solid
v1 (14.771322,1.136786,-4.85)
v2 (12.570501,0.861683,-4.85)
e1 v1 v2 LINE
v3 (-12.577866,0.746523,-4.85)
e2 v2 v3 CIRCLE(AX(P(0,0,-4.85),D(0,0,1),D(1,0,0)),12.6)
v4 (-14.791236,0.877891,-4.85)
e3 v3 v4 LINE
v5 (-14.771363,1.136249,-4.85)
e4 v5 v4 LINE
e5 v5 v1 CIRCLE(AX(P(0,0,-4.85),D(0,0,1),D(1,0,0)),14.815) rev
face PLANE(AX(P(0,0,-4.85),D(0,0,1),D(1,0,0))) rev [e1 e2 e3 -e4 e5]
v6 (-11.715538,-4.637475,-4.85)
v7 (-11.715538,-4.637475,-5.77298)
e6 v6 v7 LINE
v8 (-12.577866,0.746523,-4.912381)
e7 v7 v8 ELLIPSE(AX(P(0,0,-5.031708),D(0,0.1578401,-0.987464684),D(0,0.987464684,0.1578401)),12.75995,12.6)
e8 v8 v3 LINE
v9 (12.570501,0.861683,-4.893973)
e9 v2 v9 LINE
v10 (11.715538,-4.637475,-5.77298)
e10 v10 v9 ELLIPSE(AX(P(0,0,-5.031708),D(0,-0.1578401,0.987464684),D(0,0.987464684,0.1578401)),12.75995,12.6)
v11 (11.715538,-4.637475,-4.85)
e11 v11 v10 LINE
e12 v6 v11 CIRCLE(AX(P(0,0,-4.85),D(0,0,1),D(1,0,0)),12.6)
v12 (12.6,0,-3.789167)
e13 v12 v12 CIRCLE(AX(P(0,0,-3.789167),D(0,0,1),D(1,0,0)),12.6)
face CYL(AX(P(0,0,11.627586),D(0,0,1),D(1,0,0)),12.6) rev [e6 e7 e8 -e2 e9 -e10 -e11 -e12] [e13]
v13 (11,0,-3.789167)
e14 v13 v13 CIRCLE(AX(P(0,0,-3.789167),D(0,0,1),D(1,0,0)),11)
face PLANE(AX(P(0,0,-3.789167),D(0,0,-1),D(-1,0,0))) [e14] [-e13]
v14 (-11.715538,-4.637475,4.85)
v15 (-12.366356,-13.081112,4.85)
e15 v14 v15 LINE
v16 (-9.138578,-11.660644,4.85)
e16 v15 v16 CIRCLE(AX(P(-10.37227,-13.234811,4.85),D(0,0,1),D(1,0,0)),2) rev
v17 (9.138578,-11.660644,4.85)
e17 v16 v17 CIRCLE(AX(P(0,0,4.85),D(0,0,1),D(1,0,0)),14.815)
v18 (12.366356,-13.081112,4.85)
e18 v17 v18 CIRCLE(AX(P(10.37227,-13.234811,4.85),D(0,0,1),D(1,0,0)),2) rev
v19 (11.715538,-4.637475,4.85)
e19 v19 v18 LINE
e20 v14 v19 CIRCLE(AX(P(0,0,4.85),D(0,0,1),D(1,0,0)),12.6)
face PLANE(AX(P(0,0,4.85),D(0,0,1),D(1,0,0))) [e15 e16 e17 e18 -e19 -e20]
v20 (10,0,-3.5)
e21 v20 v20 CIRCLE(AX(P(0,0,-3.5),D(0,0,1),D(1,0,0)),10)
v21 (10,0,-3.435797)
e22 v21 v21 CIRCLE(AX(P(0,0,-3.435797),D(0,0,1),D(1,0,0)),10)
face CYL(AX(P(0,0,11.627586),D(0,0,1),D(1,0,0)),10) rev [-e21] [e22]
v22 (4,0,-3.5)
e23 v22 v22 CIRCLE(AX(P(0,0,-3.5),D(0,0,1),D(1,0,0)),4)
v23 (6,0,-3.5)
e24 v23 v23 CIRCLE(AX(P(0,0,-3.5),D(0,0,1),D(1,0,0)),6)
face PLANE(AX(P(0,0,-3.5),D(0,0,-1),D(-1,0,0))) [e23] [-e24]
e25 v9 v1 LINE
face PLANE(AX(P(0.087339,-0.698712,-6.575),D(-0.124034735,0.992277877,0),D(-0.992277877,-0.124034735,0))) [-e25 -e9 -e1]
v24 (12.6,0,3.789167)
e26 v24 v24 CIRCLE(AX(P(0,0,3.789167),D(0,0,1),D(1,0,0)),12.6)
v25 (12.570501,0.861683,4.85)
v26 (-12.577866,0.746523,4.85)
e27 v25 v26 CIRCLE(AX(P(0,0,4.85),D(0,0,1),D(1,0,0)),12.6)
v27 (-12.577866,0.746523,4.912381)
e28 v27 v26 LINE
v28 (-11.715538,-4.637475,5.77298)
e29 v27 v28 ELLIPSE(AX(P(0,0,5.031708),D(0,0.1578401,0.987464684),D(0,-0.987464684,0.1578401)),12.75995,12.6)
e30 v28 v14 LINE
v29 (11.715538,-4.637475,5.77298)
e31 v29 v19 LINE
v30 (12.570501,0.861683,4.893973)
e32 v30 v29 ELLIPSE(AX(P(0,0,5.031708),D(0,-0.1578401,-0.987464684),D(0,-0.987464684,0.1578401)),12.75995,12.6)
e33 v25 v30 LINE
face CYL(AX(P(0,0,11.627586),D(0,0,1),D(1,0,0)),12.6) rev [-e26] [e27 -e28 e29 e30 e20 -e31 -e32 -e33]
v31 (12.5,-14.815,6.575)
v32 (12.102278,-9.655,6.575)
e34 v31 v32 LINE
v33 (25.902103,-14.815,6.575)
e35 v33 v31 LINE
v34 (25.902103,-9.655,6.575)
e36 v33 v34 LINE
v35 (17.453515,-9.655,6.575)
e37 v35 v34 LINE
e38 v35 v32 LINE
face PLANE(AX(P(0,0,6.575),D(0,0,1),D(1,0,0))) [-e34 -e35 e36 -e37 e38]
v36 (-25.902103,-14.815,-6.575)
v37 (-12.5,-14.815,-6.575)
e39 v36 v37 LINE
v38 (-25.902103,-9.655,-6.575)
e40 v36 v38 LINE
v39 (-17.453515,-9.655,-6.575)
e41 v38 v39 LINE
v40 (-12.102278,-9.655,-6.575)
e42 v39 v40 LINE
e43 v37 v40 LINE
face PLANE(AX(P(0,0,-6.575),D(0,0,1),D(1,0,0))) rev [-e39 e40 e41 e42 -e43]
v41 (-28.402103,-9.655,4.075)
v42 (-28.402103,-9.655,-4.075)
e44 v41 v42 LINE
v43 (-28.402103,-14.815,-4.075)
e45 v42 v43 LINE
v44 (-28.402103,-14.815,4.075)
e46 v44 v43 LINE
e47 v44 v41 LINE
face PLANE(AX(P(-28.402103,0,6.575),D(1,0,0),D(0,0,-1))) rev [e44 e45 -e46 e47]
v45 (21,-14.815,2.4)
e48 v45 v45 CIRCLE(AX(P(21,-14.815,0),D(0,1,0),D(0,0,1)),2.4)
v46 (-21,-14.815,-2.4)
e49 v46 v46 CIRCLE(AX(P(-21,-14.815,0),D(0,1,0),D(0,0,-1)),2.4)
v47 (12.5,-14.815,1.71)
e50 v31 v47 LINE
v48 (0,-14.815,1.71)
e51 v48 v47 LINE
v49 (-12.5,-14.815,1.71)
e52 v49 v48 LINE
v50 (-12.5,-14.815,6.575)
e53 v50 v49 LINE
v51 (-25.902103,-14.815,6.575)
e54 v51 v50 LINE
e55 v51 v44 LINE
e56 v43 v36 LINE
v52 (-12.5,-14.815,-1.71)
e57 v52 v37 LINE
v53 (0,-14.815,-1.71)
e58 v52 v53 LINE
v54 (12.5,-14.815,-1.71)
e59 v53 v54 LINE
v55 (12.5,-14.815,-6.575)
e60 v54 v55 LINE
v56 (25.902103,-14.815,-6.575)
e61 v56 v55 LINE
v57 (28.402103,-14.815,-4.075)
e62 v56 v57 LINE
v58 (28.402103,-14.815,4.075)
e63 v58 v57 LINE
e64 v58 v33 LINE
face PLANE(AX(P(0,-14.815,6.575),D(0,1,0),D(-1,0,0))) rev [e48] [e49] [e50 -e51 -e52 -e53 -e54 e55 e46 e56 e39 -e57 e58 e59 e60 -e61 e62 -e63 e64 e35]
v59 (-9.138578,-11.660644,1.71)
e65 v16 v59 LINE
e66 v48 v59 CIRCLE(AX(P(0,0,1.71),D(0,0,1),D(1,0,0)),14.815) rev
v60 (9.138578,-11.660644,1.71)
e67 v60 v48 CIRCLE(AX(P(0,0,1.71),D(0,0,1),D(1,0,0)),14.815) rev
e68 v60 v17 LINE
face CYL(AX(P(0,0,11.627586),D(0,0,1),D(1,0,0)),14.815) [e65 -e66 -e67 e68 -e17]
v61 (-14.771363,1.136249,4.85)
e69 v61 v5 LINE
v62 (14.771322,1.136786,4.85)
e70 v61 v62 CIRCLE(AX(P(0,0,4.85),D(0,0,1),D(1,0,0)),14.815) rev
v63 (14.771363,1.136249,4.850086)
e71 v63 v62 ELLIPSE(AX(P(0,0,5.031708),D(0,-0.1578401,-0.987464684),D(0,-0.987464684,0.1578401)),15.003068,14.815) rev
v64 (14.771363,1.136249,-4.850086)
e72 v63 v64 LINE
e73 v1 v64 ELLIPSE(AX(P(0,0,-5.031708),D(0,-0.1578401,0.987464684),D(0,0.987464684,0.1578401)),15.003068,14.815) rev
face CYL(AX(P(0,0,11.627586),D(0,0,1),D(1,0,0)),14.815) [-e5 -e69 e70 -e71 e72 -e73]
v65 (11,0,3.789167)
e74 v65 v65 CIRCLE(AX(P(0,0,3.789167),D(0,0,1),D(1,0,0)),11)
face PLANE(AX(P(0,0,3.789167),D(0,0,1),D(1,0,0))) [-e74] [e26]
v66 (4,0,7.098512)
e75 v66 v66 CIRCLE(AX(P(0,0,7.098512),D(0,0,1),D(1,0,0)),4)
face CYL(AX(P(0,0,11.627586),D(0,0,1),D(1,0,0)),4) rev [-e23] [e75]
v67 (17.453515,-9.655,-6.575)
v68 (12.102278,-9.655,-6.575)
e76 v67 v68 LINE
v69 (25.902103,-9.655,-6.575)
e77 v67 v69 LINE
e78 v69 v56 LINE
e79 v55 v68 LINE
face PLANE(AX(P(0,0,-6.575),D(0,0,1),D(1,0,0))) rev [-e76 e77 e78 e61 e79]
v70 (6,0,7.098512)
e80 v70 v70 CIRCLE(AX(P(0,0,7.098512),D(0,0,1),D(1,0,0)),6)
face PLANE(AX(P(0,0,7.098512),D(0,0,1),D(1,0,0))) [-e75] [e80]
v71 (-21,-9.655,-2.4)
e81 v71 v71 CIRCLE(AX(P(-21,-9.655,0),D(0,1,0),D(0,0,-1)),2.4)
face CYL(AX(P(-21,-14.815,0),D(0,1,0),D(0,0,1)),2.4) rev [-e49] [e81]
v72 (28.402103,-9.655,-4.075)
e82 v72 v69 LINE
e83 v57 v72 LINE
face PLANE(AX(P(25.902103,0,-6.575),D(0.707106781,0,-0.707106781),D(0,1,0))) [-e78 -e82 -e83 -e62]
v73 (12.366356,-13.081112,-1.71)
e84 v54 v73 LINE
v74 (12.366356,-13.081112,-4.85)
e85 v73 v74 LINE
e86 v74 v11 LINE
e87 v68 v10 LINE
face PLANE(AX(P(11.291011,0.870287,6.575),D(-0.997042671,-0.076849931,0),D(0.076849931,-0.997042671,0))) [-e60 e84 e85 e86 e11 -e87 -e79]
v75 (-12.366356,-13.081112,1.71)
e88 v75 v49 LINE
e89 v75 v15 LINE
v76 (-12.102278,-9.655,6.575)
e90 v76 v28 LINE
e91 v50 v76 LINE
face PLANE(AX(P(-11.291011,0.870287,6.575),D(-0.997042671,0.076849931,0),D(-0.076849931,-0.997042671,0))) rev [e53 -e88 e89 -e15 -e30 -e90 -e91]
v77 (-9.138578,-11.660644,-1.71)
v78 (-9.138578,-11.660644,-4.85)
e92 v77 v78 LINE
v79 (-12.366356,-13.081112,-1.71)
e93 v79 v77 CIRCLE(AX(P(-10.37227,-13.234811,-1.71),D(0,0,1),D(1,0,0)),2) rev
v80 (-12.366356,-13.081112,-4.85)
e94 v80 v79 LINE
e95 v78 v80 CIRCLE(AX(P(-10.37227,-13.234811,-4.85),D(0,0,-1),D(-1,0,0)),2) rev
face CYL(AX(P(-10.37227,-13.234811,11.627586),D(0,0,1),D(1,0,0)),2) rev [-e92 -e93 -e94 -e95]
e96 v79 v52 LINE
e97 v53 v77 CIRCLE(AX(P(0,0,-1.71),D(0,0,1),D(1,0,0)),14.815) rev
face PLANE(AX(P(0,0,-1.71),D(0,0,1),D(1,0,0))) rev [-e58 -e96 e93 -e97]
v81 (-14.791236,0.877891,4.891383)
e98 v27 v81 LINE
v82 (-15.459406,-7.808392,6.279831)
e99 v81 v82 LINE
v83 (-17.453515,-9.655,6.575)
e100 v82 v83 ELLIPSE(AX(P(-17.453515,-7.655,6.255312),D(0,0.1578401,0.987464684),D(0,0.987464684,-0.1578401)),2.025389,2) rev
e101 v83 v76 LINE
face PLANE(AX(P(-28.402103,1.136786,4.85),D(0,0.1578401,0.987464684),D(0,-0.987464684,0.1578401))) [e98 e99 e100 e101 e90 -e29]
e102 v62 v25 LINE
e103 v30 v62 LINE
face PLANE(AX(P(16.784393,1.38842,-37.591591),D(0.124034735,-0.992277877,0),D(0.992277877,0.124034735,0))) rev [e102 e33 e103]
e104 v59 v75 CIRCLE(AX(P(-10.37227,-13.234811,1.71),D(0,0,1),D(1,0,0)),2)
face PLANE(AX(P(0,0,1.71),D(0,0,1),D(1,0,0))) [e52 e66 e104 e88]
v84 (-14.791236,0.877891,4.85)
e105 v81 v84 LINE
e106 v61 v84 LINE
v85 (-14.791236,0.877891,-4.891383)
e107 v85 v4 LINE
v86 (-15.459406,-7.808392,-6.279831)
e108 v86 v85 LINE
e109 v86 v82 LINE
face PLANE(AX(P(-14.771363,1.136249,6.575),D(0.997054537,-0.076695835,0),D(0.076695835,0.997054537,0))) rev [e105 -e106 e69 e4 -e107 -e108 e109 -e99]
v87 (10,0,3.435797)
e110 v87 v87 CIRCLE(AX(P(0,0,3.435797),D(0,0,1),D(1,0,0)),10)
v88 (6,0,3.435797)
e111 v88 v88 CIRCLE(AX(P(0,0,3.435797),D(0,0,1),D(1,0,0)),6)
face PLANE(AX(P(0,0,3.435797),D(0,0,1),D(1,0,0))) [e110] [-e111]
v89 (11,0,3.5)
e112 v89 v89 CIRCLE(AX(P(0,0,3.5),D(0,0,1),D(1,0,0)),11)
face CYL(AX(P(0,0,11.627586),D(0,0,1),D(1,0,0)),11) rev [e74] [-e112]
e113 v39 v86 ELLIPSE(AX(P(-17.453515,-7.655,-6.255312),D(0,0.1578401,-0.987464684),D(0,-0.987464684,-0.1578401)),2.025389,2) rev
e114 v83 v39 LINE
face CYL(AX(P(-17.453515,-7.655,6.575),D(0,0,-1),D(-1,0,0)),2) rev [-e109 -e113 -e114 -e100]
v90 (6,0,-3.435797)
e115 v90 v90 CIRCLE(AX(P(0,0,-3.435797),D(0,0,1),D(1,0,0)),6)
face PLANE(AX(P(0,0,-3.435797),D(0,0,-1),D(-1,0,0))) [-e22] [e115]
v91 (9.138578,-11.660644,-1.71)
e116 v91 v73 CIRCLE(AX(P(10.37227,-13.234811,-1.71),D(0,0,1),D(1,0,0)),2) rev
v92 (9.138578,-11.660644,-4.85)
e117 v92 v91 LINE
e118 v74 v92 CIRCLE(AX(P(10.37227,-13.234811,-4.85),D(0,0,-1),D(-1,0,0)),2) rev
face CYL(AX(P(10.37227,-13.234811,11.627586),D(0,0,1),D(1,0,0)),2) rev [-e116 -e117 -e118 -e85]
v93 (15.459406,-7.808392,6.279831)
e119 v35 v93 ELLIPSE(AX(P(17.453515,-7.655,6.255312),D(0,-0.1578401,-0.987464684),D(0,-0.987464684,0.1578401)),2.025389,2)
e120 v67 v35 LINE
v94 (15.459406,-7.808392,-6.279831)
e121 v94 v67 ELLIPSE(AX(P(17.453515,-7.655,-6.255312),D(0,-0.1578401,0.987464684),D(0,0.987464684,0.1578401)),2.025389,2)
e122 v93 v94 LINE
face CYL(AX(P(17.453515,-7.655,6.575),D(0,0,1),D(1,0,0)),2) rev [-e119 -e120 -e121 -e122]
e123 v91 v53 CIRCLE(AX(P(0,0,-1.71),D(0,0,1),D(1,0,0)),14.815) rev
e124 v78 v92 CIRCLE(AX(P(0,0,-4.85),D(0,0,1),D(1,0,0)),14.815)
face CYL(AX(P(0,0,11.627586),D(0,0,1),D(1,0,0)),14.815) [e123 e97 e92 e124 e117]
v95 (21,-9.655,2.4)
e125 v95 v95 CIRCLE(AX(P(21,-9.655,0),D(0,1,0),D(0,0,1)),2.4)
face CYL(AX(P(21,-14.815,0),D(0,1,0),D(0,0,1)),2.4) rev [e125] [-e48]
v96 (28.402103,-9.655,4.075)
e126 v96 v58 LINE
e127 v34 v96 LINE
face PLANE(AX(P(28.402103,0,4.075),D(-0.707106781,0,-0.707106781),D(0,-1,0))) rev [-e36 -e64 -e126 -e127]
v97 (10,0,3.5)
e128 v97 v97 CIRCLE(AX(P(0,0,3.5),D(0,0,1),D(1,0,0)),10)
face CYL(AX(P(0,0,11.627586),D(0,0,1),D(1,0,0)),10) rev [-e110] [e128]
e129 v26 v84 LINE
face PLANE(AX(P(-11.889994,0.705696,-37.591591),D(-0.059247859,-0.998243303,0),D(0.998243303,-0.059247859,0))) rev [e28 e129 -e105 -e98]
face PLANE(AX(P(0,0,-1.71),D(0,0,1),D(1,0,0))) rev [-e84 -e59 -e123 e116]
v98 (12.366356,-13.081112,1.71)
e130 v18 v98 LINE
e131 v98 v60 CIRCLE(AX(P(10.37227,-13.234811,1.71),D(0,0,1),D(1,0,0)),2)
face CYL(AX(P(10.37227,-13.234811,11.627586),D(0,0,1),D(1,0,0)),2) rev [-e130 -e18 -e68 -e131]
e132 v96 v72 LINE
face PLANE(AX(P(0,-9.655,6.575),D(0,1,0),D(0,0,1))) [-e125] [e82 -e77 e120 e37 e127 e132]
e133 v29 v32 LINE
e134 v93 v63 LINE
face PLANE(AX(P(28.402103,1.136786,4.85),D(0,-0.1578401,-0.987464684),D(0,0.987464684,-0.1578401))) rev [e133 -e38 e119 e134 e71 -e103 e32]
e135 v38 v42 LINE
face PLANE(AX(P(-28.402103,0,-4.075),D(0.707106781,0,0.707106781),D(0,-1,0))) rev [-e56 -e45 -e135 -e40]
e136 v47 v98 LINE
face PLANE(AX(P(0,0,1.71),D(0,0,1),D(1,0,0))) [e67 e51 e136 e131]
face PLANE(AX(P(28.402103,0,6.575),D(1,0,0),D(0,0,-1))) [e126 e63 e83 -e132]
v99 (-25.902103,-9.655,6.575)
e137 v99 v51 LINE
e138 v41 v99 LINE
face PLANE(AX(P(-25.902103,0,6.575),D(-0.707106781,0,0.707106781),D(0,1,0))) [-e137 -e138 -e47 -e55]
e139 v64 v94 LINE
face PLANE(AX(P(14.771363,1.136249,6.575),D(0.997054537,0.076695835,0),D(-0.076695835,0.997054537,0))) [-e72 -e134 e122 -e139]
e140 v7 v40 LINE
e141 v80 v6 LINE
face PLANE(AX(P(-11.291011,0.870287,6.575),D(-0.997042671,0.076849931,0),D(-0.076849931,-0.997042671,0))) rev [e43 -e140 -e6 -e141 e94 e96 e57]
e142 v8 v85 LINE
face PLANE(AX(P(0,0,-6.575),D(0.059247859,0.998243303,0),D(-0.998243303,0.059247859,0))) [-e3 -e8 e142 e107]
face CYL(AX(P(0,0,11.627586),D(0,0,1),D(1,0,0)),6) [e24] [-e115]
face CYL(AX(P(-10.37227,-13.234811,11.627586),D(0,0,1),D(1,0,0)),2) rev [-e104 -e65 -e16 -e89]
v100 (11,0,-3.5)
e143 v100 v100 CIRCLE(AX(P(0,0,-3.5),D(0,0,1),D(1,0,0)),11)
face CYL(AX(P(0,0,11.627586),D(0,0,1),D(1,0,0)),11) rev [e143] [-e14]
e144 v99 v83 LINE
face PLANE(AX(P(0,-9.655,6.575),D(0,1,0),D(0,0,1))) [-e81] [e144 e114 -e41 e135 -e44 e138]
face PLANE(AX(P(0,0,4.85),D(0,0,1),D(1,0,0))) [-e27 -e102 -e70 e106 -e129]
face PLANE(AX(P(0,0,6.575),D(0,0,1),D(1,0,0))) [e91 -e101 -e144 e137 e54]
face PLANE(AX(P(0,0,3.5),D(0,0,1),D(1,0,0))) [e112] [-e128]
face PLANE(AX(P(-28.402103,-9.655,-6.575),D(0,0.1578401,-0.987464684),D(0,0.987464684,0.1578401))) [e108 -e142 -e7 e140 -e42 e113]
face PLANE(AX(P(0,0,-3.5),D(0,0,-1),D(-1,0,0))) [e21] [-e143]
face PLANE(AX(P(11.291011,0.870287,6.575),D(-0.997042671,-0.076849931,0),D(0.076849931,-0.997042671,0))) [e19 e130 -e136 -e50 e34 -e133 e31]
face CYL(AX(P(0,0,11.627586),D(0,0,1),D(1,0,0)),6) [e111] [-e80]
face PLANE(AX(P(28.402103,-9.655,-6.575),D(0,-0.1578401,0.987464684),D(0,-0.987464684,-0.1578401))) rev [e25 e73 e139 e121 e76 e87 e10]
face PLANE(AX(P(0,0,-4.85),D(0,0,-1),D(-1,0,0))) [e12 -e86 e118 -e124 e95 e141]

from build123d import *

# Parameters (mm, degrees)
BOSS_EXTRUDE1_DEPTH     = 6.575
SKETCH8_R               = 2.400000000000001
CUT_EXTRUDE3_DEPTH      = 39.155592587632775
CHAMFER1_SIZE           = 2.5
BOSS_EXTRUDE2_DEPTH     = 1.71
FILLET1_R               = 2
CUT_EXTRUDE4_DEPTH      = 1.725
CUT_EXTRUDE5_START      = -13.15
CUT_EXTRUDE5_DEPTH      = 1.725
CUT_EXTRUDE_THIN5_START = 7
CUT_EXTRUDE_THIN5_DEPTH = 26.81086056039093
CUT_EXTRUDE_THIN6_START = -7
CUT_EXTRUDE_THIN6_DEPTH = 26.81086056039093
FILLET2_R               = 2


# Read off the part's stored shape, not the designer's step: Cut-Extrude5
with BuildPart() as part:
    # Sketch1 → Revolve1 (revolve)
    with BuildSketch(Plane(origin=(0, 0, 0), x_dir=(0, 0, -1), z_dir=(1, 0, 0)), mode=Mode.PRIVATE) as revolve1_sk:
        Polygon((-7.0985121547008365, 5.999999999999999), (-3.4357973085956934, 6), (1.3e-15, 6), (3.4357973085956957, 6), (3.499999999999999, 6), (3.499999999999999, 4), (-7.0985121547008365, 3.999999999999999), align=None)
        Polygon((3.4357973085956957, 6), (1.3e-15, 6), (-3.4357973085956934, 6), (-3.4357973085956934, 9.999999999999998), (3.435797308595695, 9.999999999999998), align=None)
        Polygon((3.5000000000000013, 9.999999999999998), (3.435797308595695, 9.999999999999998), (-3.4357973085956934, 9.999999999999998), (-3.4999999999999996, 9.999999999999998), (-3.5000000000000018, 11), (-1.18e-15, 11), (3.499999999999999, 11), align=None)
        Polygon((3.789167362820558, 11), (3.499999999999999, 11), (-1.18e-15, 11), (-3.5000000000000018, 11), (-3.789167362820557, 11), (-3.789167362820557, 12.6), (5.8e-16, 12.6), (3.789167362820558, 12.6), align=None)
        Polygon((4.8500000000000005, 12.6), (3.789167362820558, 12.6), (5.8e-16, 12.6), (-3.789167362820557, 12.6), (-4.849999999999999, 12.6), (-4.849999999999999, 14.815), (0, 14.815), (4.8500000000000005, 14.815), align=None)
    revolve(revolve1_sk.sketch.rotate(Axis((0, 0, 11.627586075142245), (0, 0, -1)), 90), axis=Axis((0, 0, 11.627586075142245), (0, 0, -1)))

    # Sketch2 → Boss-Extrude1 (add, symmetric)
    with BuildSketch(Plane.XY):
        Polygon((28.402103283084184, -9.655000000000001), (15.601451795624948, -9.655000000000001), (12.102278163852397, -9.655000000000001), (12.500000000000004, -14.815000000000001), (28.402103283084184, -14.815), align=None)
        with BuildLine():
            ThreePointArc((14.771362958963898, 1.1362487995810626), (10.066049350023114, 10.87009086819882), (-3.5216e-13, 14.815000000000007))
            Line((0, 14.815000000000005), (0, 12.6))
            ThreePointArc((3.5261e-13, 12.600000000000001), (10.420944759538665, 7.082648538410167), (11.71553796349213, -4.6374745525959185))
            Line((11.71553796349213, -4.6374745525959185), (12.10227816385239, -9.655000000000001))
            Line((12.102278163852397, -9.655000000000001), (15.601451795624948, -9.655000000000001))
            Line((15.601451795624948, -9.655000000000001), (14.7713629589639, 1.1362487995810628))
        make_face()
        with BuildLine():
            Line((0, 12.6), (0, 14.815000000000005))
            ThreePointArc((-3.5216e-13, 14.815000000000007), (-10.066049350023373, 10.87009086819858), (-14.771362958963902, 1.136248799581064))
            Line((-14.7713629589639, 1.1362487995810628), (-15.601451795624941, -9.655000000000005))
            Line((-15.601451795624941, -9.655000000000005), (-12.10227816385239, -9.655000000000005))
            Line((-12.102278163852386, -9.655000000000005), (-11.71553796349213, -4.6374745525959185))
            ThreePointArc((-11.71553796349213, -4.637474552595917), (-10.420944759538465, 7.08264853841046), (3.5261e-13, 12.600000000000001))
        make_face()
        Polygon((-12.10227816385239, -9.655000000000005), (-15.601451795624941, -9.655000000000005), (-28.402103283084177, -9.655000000000006), (-28.402103283084177, -14.815000000000007), (-12.499999999999996, -14.815000000000005), align=None)
    extrude(amount=BOSS_EXTRUDE1_DEPTH, both=True)

    # Sketch8 → Cut-Extrude3 (cut, through all)
    with BuildSketch(Plane(origin=(0, -9.655000000000001, 0), x_dir=(1, 0, 0), z_dir=(0, 1, 0))):
        with Locations(Location((21.000000000000004, 0, 0), (0, 0, 270))):
            Circle(SKETCH8_R)
        with Locations(Location((-21.000000000000004, 0, 0), (0, 0, 90))):
            Circle(SKETCH8_R)
    extrude(amount=-CUT_EXTRUDE3_DEPTH, mode=Mode.SUBTRACT)

    # Chamfer1
    chamfer1_edges = [part.edges().sort_by_distance(p)[0] for p in [
        (-28.402103283084177, -12.235000000000007, -6.575),
        (28.402103283084184, -12.235, 6.575),
        (-28.402103283084177, -12.235000000000007, 6.575),
        (28.402103283084184, -12.235, -6.575),
    ]]
    chamfer(chamfer1_edges, length=CHAMFER1_SIZE)

    # Sketch9 → Boss-Extrude2 (add, symmetric)
    with BuildSketch(Plane.XY):
        with BuildLine():
            Line((-12.499999999999996, -14.815000000000007), (12.500000000000004, -14.815000000000001))
            Line((12.500000000000004, -14.815000000000001), (11.715537963492132, -4.637474552595919))
            ThreePointArc((11.715537963492132, -4.637474552595919), (-9.9e-16, -12.600000000000003), (-11.71553796349213, -4.6374745525959185))
            Line((-11.71553796349213, -4.6374745525959185), (-12.499999999999996, -14.815000000000007))
        make_face()
    extrude(amount=BOSS_EXTRUDE2_DEPTH, both=True)

    # Fillet1
    fillet1_edges = [part.edges().sort_by_distance(p)[0] for p in [
        (12.025078643317716, -8.653421786901651, -3.2800000000000002),
        (-12.025078643317713, -8.653421786901657, -3.2800000000000002),
        (-12.025078643317713, -8.653421786901657, 3.2799999999999994),
        (12.025078643317716, -8.653421786901651, 3.2799999999999994),
    ]]
    fillet(fillet1_edges, radius=FILLET1_R)

    # Sketch13 → Cut-Extrude4 (cut)
    with BuildSketch(Plane.XY.offset(6.575)):
        Polygon((-11.889993926761807, 0.705696375939659), (-17.610193659545324, 1.0452023711437894), (-14.425824047946865, 15.189187645015892), (3.1299229448728054, 17.38365601911835), (21.41715939572663, 11.678038246451958), (16.784392828177, 1.3884198701048673), (11.94080724759393, 0.7829716725319836), (0.5940928236877405, 11.678038246451958), align=None)
    extrude(amount=-CUT_EXTRUDE4_DEPTH, mode=Mode.SUBTRACT)

    # Cut-Extrude5 outline → Cut-Extrude5 (cut)
    with BuildSketch(Plane.XY.offset(6.575).offset(CUT_EXTRUDE5_START)):
        with BuildLine():
            Line((-14.791236442, 0.877891277), (-12.577865613, 0.746523021))
            ThreePointArc((-12.577865613, 0.746523021), (-0.057697816, 12.599867895), (12.57050125, 0.861683423))
            Line((12.57050125, 0.861683423), (14.771321629, 1.13678597))
            ThreePointArc((14.771321629, 1.13678597), (-0.000269379, 14.814999998), (-14.771362959, 1.1362488))
            Line((-14.771362959, 1.1362488), (-14.791236442, 0.877891277))
        make_face()
    extrude(amount=CUT_EXTRUDE5_DEPTH, mode=Mode.SUBTRACT)

    # Sketch14 → Cut-Extrude-Thin5 (cut, through all)
    with BuildSketch(Plane(origin=(0, 0, 0), x_dir=(0, 0, -1), z_dir=(1, 0, 0)).offset(CUT_EXTRUDE_THIN5_START)):
        Polygon((-4.849999999999999, 1.1367859701682461), (-6.575, -9.655000000000001), (-16.449646842920206, -8.076598996577228), (-14.724646842920205, 2.7151869735910195), align=None)
        Polygon((6.575, -9.655000000000001), (4.8500000000000005, 1.1367859701682461), (14.724646842920205, 2.7151869735910177), (16.449646842920206, -8.07659899657723), align=None)
    extrude(amount=CUT_EXTRUDE_THIN5_DEPTH, mode=Mode.SUBTRACT)

    # Sketch14<2> → Cut-Extrude-Thin6 (cut, through all)
    with BuildSketch(Plane(origin=(0, 0, 0), x_dir=(0, 0, -1), z_dir=(1, 0, 0)).offset(CUT_EXTRUDE_THIN6_START)):
        Polygon((-4.849999999999999, 1.1367859701682461), (-6.575, -9.655000000000001), (-16.449646842920206, -8.076598996577228), (-14.724646842920205, 2.7151869735910195), align=None)
        Polygon((6.575, -9.655000000000001), (4.8500000000000005, 1.1367859701682461), (14.724646842920205, 2.7151869735910177), (16.449646842920206, -8.07659899657723), align=None)
    extrude(amount=-CUT_EXTRUDE_THIN6_DEPTH, mode=Mode.SUBTRACT)

    # Fillet2
    fillet2_edges = [part.edges().sort_by_distance(p)[0] for p in [
        (15.601451795624948, -9.655000000000001, 0),
        (-15.601451795624941, -9.655000000000005, 0),
    ]]
    fillet(fillet2_edges, radius=FILLET2_R)


solid = part.part
